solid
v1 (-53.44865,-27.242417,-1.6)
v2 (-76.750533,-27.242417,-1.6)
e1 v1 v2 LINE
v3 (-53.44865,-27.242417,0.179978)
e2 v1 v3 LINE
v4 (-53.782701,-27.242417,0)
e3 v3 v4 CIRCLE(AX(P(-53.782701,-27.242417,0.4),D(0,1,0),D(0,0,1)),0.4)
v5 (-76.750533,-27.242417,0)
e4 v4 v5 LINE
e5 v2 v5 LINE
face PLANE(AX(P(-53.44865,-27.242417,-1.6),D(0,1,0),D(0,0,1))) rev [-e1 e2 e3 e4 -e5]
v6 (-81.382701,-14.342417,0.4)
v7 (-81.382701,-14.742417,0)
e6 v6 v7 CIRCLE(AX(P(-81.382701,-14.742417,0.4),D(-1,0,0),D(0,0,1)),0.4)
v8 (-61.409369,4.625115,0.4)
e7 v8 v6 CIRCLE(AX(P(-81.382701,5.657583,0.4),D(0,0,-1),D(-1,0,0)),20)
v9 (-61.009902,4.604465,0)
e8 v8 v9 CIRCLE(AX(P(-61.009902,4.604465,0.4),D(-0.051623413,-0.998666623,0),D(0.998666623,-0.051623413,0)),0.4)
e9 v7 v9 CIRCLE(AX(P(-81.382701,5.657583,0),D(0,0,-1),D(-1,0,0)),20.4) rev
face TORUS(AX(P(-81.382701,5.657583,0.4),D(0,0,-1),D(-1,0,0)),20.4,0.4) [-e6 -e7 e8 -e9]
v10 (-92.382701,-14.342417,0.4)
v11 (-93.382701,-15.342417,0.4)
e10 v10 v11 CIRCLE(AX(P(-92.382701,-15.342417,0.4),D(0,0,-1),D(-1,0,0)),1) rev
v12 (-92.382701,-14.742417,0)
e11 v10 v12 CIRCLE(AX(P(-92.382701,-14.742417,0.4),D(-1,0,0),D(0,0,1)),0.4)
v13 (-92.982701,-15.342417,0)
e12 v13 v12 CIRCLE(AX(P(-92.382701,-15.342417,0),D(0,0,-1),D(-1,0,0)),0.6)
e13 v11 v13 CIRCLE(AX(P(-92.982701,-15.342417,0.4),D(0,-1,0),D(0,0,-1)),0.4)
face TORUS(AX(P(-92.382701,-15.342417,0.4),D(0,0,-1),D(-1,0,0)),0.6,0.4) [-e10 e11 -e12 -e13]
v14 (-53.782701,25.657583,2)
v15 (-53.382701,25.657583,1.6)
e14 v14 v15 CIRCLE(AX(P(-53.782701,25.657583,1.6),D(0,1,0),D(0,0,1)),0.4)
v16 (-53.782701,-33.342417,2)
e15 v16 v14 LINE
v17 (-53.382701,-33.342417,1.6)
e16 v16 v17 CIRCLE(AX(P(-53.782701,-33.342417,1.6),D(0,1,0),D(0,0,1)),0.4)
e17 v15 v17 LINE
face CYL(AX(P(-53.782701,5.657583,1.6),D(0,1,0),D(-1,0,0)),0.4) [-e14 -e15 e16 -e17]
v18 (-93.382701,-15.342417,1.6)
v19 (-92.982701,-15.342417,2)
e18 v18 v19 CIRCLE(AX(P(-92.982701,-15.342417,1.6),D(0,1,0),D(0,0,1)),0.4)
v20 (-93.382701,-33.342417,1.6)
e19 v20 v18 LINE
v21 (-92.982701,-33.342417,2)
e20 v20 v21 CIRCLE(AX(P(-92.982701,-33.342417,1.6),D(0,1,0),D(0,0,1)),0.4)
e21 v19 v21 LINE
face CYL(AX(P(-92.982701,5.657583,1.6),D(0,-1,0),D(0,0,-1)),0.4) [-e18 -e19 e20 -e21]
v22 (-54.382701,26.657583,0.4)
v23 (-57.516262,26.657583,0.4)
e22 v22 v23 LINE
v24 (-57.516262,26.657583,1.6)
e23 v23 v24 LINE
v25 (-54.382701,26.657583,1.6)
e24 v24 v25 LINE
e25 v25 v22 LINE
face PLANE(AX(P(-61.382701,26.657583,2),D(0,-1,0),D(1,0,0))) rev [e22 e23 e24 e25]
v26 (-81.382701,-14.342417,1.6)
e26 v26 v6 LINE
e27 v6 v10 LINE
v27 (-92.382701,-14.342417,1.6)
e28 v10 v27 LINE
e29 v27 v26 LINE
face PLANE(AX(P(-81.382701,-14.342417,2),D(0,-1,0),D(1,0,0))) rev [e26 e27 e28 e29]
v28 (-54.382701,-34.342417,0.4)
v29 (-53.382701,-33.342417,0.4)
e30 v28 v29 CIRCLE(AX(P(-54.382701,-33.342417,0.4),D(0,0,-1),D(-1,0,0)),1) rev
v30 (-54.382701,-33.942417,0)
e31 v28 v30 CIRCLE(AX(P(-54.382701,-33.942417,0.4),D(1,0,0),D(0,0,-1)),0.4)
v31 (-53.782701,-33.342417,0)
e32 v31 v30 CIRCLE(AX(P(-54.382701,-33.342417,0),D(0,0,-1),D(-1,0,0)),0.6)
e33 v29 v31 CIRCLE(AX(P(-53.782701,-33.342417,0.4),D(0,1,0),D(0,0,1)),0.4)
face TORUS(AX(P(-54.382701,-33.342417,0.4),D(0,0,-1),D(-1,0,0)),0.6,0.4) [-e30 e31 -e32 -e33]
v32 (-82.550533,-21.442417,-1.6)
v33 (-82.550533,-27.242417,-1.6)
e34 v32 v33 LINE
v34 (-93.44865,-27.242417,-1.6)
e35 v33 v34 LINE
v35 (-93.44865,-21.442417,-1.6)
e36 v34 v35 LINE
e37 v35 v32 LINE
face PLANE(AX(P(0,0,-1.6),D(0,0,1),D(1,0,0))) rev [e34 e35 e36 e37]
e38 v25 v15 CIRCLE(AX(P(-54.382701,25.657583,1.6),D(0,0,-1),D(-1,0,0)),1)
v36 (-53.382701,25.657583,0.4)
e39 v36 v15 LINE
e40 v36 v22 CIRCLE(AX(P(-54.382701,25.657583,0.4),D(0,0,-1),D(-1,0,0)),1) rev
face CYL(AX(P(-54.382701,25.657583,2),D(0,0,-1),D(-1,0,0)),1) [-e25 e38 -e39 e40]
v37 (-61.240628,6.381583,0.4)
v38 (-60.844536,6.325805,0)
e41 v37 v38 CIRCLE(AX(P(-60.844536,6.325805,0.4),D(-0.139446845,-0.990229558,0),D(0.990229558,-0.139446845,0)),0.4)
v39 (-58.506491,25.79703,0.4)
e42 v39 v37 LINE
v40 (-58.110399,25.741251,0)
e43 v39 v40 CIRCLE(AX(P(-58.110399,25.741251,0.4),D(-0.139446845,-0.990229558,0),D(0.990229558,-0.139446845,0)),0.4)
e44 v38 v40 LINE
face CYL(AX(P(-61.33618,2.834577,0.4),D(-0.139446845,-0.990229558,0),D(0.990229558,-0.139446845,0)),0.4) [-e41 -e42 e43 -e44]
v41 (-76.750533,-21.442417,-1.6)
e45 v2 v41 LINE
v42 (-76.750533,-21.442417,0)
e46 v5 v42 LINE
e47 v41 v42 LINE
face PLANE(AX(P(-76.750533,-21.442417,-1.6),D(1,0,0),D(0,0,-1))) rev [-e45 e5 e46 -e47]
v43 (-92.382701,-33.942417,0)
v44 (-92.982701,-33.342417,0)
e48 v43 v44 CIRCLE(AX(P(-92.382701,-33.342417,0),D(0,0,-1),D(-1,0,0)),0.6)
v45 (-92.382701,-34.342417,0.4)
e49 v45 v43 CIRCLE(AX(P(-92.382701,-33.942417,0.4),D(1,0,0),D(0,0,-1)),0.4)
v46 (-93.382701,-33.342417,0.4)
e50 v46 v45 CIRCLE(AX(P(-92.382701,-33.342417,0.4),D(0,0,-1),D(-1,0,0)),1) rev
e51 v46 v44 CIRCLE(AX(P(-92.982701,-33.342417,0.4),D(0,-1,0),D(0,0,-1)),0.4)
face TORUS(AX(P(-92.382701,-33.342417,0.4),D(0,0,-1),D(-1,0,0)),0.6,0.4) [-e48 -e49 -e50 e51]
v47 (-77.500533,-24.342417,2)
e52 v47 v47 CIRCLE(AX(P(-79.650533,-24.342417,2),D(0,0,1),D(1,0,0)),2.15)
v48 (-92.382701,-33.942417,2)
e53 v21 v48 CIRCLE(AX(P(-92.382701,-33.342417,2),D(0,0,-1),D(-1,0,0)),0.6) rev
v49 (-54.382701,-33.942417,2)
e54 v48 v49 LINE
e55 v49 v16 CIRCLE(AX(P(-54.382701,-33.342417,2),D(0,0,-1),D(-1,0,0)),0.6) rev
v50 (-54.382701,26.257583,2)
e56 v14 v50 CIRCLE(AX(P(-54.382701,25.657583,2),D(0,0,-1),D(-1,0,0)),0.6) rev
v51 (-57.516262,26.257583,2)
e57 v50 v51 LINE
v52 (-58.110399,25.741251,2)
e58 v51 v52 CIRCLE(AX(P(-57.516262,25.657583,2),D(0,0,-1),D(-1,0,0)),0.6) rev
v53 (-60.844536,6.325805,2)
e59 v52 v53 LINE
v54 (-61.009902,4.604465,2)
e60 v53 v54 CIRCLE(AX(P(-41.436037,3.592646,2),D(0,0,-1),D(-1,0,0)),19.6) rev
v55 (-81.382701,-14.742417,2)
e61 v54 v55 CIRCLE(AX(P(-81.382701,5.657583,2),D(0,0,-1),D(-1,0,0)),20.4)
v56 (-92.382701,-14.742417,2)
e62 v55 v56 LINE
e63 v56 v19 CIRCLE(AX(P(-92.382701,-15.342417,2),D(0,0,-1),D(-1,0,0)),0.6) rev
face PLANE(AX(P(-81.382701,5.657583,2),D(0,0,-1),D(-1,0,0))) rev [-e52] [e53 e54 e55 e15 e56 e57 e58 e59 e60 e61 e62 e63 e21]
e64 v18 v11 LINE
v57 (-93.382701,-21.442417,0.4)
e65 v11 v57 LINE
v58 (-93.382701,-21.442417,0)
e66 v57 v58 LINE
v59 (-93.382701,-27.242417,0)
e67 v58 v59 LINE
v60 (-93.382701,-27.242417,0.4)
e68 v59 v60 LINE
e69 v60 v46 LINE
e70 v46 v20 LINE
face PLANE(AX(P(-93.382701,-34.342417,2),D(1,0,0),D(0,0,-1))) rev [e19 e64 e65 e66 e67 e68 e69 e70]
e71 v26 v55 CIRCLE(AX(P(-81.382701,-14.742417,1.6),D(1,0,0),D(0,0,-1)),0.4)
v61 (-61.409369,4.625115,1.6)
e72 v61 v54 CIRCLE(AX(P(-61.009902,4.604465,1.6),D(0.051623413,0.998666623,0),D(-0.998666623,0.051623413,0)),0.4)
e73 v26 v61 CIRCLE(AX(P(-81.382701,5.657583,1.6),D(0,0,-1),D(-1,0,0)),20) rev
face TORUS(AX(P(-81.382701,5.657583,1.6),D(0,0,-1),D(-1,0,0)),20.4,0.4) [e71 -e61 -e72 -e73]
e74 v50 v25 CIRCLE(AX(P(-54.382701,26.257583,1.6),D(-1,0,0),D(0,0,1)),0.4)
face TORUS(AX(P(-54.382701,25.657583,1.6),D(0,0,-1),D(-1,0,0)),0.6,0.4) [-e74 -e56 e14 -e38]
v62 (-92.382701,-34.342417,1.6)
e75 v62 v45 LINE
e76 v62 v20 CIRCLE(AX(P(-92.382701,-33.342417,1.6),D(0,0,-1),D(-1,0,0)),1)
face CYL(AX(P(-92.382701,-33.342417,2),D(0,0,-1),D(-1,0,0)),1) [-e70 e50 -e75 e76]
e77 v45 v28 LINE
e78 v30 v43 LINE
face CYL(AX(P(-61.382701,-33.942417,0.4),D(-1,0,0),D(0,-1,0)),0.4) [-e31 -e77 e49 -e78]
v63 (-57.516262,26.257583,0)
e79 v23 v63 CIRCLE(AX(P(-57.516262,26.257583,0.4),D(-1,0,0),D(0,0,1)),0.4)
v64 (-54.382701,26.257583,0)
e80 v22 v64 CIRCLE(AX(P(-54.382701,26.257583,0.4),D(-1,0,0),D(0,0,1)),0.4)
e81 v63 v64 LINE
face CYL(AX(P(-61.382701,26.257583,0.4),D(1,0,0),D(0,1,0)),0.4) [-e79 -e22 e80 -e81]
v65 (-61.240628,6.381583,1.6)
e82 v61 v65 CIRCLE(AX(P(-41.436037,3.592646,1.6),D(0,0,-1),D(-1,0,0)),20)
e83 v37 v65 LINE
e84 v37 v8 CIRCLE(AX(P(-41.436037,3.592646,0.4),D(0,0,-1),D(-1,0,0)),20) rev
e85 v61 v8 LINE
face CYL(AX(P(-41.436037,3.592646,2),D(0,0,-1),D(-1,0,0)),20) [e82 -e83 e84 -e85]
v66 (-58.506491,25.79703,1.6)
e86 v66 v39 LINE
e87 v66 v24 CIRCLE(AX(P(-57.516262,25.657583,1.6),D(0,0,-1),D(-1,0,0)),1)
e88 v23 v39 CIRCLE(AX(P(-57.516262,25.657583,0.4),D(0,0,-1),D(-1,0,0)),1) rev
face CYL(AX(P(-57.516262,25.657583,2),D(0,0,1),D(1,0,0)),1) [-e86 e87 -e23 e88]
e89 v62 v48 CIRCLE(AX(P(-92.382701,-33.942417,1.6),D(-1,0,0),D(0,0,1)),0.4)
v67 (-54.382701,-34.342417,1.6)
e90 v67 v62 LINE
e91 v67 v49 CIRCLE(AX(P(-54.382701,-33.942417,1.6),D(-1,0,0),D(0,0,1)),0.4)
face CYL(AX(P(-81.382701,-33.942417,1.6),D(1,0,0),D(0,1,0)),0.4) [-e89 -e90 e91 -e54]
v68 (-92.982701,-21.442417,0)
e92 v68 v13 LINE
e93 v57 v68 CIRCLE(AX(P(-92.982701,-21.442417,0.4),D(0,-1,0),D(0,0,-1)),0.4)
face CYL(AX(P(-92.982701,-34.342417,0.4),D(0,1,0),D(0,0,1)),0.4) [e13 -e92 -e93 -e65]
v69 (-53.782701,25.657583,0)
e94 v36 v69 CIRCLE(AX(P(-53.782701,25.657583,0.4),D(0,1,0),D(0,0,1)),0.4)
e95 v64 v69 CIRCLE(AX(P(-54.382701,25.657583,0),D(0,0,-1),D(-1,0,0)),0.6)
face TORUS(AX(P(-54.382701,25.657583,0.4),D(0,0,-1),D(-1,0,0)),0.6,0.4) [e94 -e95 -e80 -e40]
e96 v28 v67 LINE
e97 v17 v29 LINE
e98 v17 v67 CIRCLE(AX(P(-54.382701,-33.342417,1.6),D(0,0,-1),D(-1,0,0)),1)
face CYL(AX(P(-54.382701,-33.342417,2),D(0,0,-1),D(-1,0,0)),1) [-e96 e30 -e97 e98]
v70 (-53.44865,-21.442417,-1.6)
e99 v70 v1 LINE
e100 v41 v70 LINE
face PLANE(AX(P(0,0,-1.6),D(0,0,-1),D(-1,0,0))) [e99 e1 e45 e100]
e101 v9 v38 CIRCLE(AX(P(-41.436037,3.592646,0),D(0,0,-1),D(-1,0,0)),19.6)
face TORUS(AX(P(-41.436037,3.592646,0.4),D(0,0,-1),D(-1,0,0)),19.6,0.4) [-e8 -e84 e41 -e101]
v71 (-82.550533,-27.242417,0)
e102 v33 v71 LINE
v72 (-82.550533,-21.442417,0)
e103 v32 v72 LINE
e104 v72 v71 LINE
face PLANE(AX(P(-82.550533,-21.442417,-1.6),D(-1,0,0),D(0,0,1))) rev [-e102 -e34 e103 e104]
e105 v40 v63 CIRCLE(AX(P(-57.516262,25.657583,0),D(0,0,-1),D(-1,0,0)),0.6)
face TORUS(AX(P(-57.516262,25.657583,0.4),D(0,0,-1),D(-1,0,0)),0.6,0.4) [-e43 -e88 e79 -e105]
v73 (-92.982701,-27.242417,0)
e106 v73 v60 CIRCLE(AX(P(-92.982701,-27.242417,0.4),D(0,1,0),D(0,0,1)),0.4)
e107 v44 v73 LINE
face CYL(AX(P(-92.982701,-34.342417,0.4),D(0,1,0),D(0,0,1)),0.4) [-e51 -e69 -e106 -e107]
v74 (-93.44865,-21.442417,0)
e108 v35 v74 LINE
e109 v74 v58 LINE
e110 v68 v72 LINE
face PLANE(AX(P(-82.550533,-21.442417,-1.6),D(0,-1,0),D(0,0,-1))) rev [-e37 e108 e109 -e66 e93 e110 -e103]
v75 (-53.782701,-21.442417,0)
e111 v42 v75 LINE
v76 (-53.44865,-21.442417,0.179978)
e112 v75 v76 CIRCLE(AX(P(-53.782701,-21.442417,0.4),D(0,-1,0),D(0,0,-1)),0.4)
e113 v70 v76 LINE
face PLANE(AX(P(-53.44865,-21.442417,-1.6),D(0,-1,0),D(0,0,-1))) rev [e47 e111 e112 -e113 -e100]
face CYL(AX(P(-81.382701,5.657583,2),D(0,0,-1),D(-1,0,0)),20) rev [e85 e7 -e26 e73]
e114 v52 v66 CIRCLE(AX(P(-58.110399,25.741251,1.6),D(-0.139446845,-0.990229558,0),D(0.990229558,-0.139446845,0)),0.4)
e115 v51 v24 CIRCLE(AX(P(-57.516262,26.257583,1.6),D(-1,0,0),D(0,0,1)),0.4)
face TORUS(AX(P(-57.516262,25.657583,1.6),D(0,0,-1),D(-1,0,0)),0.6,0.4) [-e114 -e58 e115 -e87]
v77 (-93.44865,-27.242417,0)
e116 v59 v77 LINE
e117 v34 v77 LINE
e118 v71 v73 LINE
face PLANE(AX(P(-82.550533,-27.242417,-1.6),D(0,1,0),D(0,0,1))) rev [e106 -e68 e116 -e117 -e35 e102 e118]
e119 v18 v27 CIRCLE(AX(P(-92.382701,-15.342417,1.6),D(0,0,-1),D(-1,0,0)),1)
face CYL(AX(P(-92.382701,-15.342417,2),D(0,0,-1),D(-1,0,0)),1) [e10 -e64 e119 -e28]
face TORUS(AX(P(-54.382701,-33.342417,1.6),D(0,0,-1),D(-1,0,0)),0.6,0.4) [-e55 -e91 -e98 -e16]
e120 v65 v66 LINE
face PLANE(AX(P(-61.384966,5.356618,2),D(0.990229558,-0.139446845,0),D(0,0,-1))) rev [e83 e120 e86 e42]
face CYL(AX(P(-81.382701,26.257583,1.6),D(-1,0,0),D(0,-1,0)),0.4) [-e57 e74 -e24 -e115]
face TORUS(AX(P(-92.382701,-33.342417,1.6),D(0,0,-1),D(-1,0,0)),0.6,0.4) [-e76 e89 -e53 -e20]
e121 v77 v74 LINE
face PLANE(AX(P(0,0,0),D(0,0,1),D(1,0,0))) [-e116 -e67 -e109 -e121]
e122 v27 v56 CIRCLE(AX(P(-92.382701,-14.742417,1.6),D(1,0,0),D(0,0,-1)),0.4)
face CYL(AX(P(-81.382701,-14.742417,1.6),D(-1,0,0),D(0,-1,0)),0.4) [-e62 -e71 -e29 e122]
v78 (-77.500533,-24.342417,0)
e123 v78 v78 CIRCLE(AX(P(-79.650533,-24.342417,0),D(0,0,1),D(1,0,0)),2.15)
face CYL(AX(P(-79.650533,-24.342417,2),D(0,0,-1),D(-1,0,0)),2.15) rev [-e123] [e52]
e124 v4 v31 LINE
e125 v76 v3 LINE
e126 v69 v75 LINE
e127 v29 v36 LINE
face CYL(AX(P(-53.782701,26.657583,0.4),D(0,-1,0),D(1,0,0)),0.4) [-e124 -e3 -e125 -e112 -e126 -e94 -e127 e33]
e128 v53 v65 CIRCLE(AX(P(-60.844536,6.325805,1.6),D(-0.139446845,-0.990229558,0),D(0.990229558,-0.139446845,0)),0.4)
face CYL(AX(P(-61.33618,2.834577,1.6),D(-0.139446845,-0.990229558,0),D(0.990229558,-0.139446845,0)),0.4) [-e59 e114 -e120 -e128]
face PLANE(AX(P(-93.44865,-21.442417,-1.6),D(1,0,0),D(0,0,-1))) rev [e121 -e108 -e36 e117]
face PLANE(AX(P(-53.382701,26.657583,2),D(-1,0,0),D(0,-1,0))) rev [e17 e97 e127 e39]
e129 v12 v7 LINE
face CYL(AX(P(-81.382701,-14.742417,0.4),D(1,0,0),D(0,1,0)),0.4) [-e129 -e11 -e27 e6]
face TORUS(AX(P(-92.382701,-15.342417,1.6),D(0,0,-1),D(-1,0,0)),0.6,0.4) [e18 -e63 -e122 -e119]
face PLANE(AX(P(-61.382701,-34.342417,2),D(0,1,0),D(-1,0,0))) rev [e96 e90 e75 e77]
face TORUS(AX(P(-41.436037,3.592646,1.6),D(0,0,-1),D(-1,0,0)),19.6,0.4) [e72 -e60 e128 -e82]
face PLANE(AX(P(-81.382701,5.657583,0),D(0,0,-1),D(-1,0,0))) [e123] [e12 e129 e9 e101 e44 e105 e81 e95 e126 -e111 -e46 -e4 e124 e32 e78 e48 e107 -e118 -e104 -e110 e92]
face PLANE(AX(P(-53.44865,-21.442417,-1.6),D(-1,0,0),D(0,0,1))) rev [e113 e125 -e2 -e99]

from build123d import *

# Parameters (mm, degrees)
SKETCH_1_R          = 2.15
EXTRUDE_1_DEPTH     = 2
SKETCH_2_W          = 23.301883536
SKETCH_2_H          = 5.8
SKETCH_2_W_2        = 10.898116464
EXTRUDE_2_DEPTH     = 1.6
FILLET_1_R          = 1
CHAMFER_START       = -66
CHAMFER_1_OUTLINE_W = 25
CHAMFER_1_OUTLINE_H = 4
CHAMFER_1_DEPTH     = 4.467828672
FILLET_2_R          = 1
FILLET_3_R          = 20
FILLET_5_R          = 0.4
FILLET_6_R          = 0.4


with BuildPart() as part:
    # 草图1 → 凸台-拉伸1 (new body)
    with BuildSketch(Plane.XY):
        with BuildLine():
            Line((-61.382701422, 26.657582938), (-53.382701422, 26.657582938))
            Line((-53.382701422, 26.657582938), (-53.382701422, -34.342417062))
            Line((-53.382701422, -34.342417062), (-61.382701422, -34.342417062))
            Line((-61.382701422, -34.342417062), (-93.382701422, -34.342417062))
            Line((-93.382701422, -34.342417062), (-93.382701422, -14.342417062))
            Line((-93.382701422, -14.342417062), (-81.382701422, -14.342417062))
            ThreePointArc((-81.382701422, -14.342417062), (-67.240565798, -8.484552685), (-61.382701422, 5.657582938))
            Line((-61.382701422, 5.657582938), (-61.382701422, 26.657582938))
        make_face()
        with Locations((-79.650533319, -24.342417062)):
            Circle(SKETCH_1_R, mode=Mode.SUBTRACT)
    extrude(amount=EXTRUDE_1_DEPTH)

    # 草图2 → 凸台-拉伸2 (add)
    with BuildSketch(Plane(origin=(0, 0, 0), x_dir=(-1, 0, 0), z_dir=(0, 0, -1))):
        with Locations((65.099591551, -24.342417062)):
            Rectangle(SKETCH_2_W, SKETCH_2_H)
        with Locations((87.999591551, -24.342417062)):
            Rectangle(SKETCH_2_W_2, SKETCH_2_H)
    extrude(amount=EXTRUDE_2_DEPTH)

    # 圆角1
    fillet_1_edges = [part.edges().sort_by_distance(p)[0] for p in [
        (-53.382701422, 26.657582938, 1),
        (-53.382701422, -34.342417062, 1),
        (-93.382701422, -34.342417062, 1),
        (-93.382701422, -14.342417062, 1),
    ]]
    fillet(fillet_1_edges, radius=FILLET_1_R)

    # 倒角1: read off the stored shape, not the designer's step
    # 倒角1 outline → 倒角1 (cut)
    with BuildSketch(Plane(origin=(0, 0, 0), x_dir=(0.13944684527210205, 0.9902295579024383, 0), z_dir=(0.9902295579024384, -0.13944684527210205, 0)).offset(CHAMFER_START)):
        with Locations((7.5, 1)):
            Rectangle(CHAMFER_1_OUTLINE_W, CHAMFER_1_OUTLINE_H)
    extrude(amount=CHAMFER_1_DEPTH, mode=Mode.SUBTRACT)

    # 圆角2
    fillet_2_edges = [part.edges().sort_by_distance(p)[0] for p in [
        (-58.385305734, 26.657582938, 1),
    ]]
    fillet(fillet_2_edges, radius=FILLET_2_R)

    # 圆角3
    fillet_3_edges = [part.edges().sort_by_distance(p)[0] for p in [
        (-61.384966041, 5.356618447, 1),
    ]]
    fillet(fillet_3_edges, radius=FILLET_3_R)

    # 圆角5
    # the kernel refuses this fillet: 0.4 mm, written as the material it takes off along each edge
    with BuildSketch(Plane(origin=(-93.382701422, -21.442417062, 0), x_dir=(1, 0, 0), z_dir=(0, 1, 0)), Plane(origin=(-93.382701422, -33.342417062, 0), x_dir=(1, 0, 0), z_dir=(0, 1, 0))) as fillet_5_piece_1:
        with BuildLine():
            CenterArc((FILLET_5_R, -FILLET_5_R), FILLET_5_R, 90, 90)
            Line((0, -FILLET_5_R), (0, 0))
            Line((0, 0), (FILLET_5_R, 0))
        make_face()
    extrude(amount=6.1, mode=Mode.SUBTRACT)
    with BuildSketch(Plane(origin=(-92.382701422, -15.342417062, 0), x_dir=(0, 1, 0), z_dir=(1, 0, 0))) as fillet_5_piece_2:
        with BuildLine():
            CenterArc((1 - FILLET_5_R, FILLET_5_R), FILLET_5_R, 270, 90)
            Line((1, FILLET_5_R), (1, 0))
            Line((1, 0), (1 - FILLET_5_R, 0))
        make_face()
    revolve(axis=Axis((-92.382701422, -15.342417062, 0), (0, 0, 1)), revolution_arc=90, mode=Mode.SUBTRACT)
    with BuildSketch(Plane(origin=(-92.382701422, -14.342417062, 0), x_dir=(0, -1, 0), z_dir=(1, 0, 0))) as fillet_5_piece_3:
        with BuildLine():
            CenterArc((FILLET_5_R, -FILLET_5_R), FILLET_5_R, 90, 90)
            Line((0, -FILLET_5_R), (0, 0))
            Line((0, 0), (FILLET_5_R, 0))
        make_face()
    extrude(amount=11, mode=Mode.SUBTRACT)
    with BuildSketch(Plane(origin=(-81.382701422, 5.657582938, 0), x_dir=(0, -1, 0), z_dir=(-1, 0, 0))) as fillet_5_piece_4:
        with BuildLine():
            CenterArc((20 + FILLET_5_R, FILLET_5_R), FILLET_5_R, 180, 90)
            Line((20, FILLET_5_R), (20, 0))
            Line((20, 0), (20 + FILLET_5_R, 0))
        make_face()
    revolve(axis=Axis((-81.382701422, 5.657582938, 0), (0, 0, 1)), revolution_arc=87.040880974, mode=Mode.SUBTRACT)
    with BuildSketch(Plane(origin=(-92.382701422, -33.342417062, 0), x_dir=(-1, 0, 0), z_dir=(0, 1, 0))) as fillet_5_piece_5:
        with BuildLine():
            CenterArc((1 - FILLET_5_R, FILLET_5_R), FILLET_5_R, 270, 90)
            Line((1, FILLET_5_R), (1, 0))
            Line((1, 0), (1 - FILLET_5_R, 0))
        make_face()
    revolve(axis=Axis((-92.382701422, -33.342417062, 0), (0, 0, 1)), revolution_arc=90, mode=Mode.SUBTRACT)
    with BuildSketch(Plane(origin=(-92.382701422, -34.342417062, 0), x_dir=(0, 1, 0), z_dir=(1, 0, 0))) as fillet_5_piece_6:
        with BuildLine():
            CenterArc((FILLET_5_R, FILLET_5_R), FILLET_5_R, 180, 90)
            Line((0, FILLET_5_R), (0, 0))
            Line((0, 0), (FILLET_5_R, 0))
        make_face()
    extrude(amount=38, mode=Mode.SUBTRACT)
    with BuildSketch(Plane(origin=(-54.382701422, -33.342417062, 0), x_dir=(0, -1, 0), z_dir=(-1, 0, 0))) as fillet_5_piece_7:
        with BuildLine():
            CenterArc((1 - FILLET_5_R, FILLET_5_R), FILLET_5_R, 270, 90)
            Line((1, FILLET_5_R), (1, 0))
            Line((1, 0), (1 - FILLET_5_R, 0))
        make_face()
    revolve(axis=Axis((-54.382701422, -33.342417062, 0), (0, 0, 1)), revolution_arc=90, mode=Mode.SUBTRACT)
    with BuildSketch(Plane(origin=(-53.382701422, 25.657582938, 0), x_dir=(-1, 0, 0), z_dir=(0, -1, 0))) as fillet_5_piece_8_section:
        with BuildLine():
            CenterArc((FILLET_5_R, -FILLET_5_R), FILLET_5_R, 90, 90)
            Line((0, -FILLET_5_R), (0, 0))
            Line((0, 0), (FILLET_5_R, 0))
        make_face()
    fillet_5_piece_8 = extrude(amount=59, mode=Mode.PRIVATE)
    fillet_5_piece_8 = split(fillet_5_piece_8, bisect_by=Plane(origin=(-53.382701422, -21.442417062, 0), z_dir=(0, 1, 0)), keep=Keep.TOP, mode=Mode.PRIVATE)
    add(fillet_5_piece_8, mode=Mode.SUBTRACT)
    with BuildSketch(Plane(origin=(-53.382701422, 25.657582938, 0), x_dir=(-1, 0, 0), z_dir=(0, -1, 0))) as fillet_5_piece_9_section:
        with BuildLine():
            CenterArc((FILLET_5_R, -FILLET_5_R), FILLET_5_R, 90, 90)
            Line((0, -FILLET_5_R), (0, 0))
            Line((0, 0), (FILLET_5_R, 0))
        make_face()
    fillet_5_piece_9 = extrude(amount=59, mode=Mode.PRIVATE)
    fillet_5_piece_9 = split(fillet_5_piece_9, bisect_by=Plane(origin=(-53.448649783, 25.657582938, 0), z_dir=(1, 0, 0)), keep=Keep.TOP, mode=Mode.PRIVATE)
    add(fillet_5_piece_9, mode=Mode.SUBTRACT)
    with BuildSketch(Plane(origin=(-53.382701422, 25.657582938, 0), x_dir=(-1, 0, 0), z_dir=(0, -1, 0))) as fillet_5_piece_10_section:
        with BuildLine():
            CenterArc((FILLET_5_R, -FILLET_5_R), FILLET_5_R, 90, 90)
            Line((0, -FILLET_5_R), (0, 0))
            Line((0, 0), (FILLET_5_R, 0))
        make_face()
    fillet_5_piece_10 = extrude(amount=59, mode=Mode.PRIVATE)
    fillet_5_piece_10 = split(fillet_5_piece_10, bisect_by=Plane(origin=(-53.382701422, -27.242417062, 0), z_dir=(0, -1, 0)), keep=Keep.TOP, mode=Mode.PRIVATE)
    add(fillet_5_piece_10, mode=Mode.SUBTRACT)
    with BuildSketch(Plane(origin=(-54.382701422, 25.657582938, 0), x_dir=(0, 1, 0), z_dir=(-1, 0, 0))) as fillet_5_piece_11:
        with BuildLine():
            CenterArc((1 - FILLET_5_R, -FILLET_5_R), FILLET_5_R, 0, 90)
            Line((1, -FILLET_5_R), (1, 0))
            Line((1, 0), (1 - FILLET_5_R, 0))
        make_face()
    revolve(axis=Axis((-54.382701422, 25.657582938, 0), (0, 0, -1)), revolution_arc=90, mode=Mode.SUBTRACT)
    with BuildSketch(Plane(origin=(-57.516261634, 26.657582938, 0), x_dir=(0, -1, 0), z_dir=(1, 0, 0))) as fillet_5_piece_12:
        with BuildLine():
            CenterArc((FILLET_5_R, -FILLET_5_R), FILLET_5_R, 90, 90)
            Line((0, -FILLET_5_R), (0, 0))
            Line((0, 0), (FILLET_5_R, 0))
        make_face()
    extrude(amount=3.133560212, mode=Mode.SUBTRACT)
    with BuildSketch(Plane(origin=(-57.516261634, 25.657582938, 0), x_dir=(0, 1, 0), z_dir=(1, 0, 0))) as fillet_5_piece_13:
        with BuildLine():
            CenterArc((1 - FILLET_5_R, FILLET_5_R), FILLET_5_R, 270, 90)
            Line((1, FILLET_5_R), (1, 0))
            Line((1, 0), (1 - FILLET_5_R, 0))
        make_face()
    revolve(axis=Axis((-57.516261634, 25.657582938, 0), (0, 0, 1)), revolution_arc=81.984161159, mode=Mode.SUBTRACT)
    with BuildSketch(Plane(origin=(-58.506491192, 25.797029784, 0), x_dir=(0.9902295579024384, -0.13944684527210205, 0), z_dir=(-0.13944684527210205, -0.9902295579024384, 0))) as fillet_5_piece_14:
        with BuildLine():
            CenterArc((FILLET_5_R, FILLET_5_R), FILLET_5_R, 180, 90)
            Line((0, FILLET_5_R), (0, 0))
            Line((0, 0), (FILLET_5_R, 0))
        make_face()
    extrude(amount=19.60701568, mode=Mode.SUBTRACT)
    with BuildSketch(Plane(origin=(-41.436036516, 3.592646409, 0), x_dir=(-0.9902295579024383, 0.13944684527210185, 0), z_dir=(0.13944684527210185, 0.9902295579024383, 0))) as fillet_5_piece_15:
        with BuildLine():
            CenterArc((20 - FILLET_5_R, FILLET_5_R), FILLET_5_R, 270, 90)
            Line((20, FILLET_5_R), (20, 0))
            Line((20, 0), (20 - FILLET_5_R, 0))
        make_face()
    revolve(axis=Axis((-41.436036516, 3.592646409, 0), (0, 0, 1)), revolution_arc=5.056719815, mode=Mode.SUBTRACT)

    # 圆角6
    fillet_6_edges = [part.edges().sort_by_distance(p)[0] for p in [
        (-86.882701422, -14.342417062, 2),
        (-55.949481528, 26.657582938, 2),
        (-53.382701422, -3.842417062, 2),
        (-93.382701422, -24.342417062, 2),
        (-73.382701422, -34.342417062, 2),
        (-93.089808203, -14.63531028, 2),
        (-93.089808203, -34.049523843, 2),
        (-53.675594641, -34.049523843, 2),
        (-53.675594641, 26.36468972, 2),
        (-59.873559433, 16.089306549, 2),
        (-58.172216341, 26.412383192, 2),
        (-67.610435183, -8.844992097, 2),
        (-61.344378918, 5.505210859, 2),
    ]]
    fillet(fillet_6_edges, radius=FILLET_6_R)


solid = part.part
